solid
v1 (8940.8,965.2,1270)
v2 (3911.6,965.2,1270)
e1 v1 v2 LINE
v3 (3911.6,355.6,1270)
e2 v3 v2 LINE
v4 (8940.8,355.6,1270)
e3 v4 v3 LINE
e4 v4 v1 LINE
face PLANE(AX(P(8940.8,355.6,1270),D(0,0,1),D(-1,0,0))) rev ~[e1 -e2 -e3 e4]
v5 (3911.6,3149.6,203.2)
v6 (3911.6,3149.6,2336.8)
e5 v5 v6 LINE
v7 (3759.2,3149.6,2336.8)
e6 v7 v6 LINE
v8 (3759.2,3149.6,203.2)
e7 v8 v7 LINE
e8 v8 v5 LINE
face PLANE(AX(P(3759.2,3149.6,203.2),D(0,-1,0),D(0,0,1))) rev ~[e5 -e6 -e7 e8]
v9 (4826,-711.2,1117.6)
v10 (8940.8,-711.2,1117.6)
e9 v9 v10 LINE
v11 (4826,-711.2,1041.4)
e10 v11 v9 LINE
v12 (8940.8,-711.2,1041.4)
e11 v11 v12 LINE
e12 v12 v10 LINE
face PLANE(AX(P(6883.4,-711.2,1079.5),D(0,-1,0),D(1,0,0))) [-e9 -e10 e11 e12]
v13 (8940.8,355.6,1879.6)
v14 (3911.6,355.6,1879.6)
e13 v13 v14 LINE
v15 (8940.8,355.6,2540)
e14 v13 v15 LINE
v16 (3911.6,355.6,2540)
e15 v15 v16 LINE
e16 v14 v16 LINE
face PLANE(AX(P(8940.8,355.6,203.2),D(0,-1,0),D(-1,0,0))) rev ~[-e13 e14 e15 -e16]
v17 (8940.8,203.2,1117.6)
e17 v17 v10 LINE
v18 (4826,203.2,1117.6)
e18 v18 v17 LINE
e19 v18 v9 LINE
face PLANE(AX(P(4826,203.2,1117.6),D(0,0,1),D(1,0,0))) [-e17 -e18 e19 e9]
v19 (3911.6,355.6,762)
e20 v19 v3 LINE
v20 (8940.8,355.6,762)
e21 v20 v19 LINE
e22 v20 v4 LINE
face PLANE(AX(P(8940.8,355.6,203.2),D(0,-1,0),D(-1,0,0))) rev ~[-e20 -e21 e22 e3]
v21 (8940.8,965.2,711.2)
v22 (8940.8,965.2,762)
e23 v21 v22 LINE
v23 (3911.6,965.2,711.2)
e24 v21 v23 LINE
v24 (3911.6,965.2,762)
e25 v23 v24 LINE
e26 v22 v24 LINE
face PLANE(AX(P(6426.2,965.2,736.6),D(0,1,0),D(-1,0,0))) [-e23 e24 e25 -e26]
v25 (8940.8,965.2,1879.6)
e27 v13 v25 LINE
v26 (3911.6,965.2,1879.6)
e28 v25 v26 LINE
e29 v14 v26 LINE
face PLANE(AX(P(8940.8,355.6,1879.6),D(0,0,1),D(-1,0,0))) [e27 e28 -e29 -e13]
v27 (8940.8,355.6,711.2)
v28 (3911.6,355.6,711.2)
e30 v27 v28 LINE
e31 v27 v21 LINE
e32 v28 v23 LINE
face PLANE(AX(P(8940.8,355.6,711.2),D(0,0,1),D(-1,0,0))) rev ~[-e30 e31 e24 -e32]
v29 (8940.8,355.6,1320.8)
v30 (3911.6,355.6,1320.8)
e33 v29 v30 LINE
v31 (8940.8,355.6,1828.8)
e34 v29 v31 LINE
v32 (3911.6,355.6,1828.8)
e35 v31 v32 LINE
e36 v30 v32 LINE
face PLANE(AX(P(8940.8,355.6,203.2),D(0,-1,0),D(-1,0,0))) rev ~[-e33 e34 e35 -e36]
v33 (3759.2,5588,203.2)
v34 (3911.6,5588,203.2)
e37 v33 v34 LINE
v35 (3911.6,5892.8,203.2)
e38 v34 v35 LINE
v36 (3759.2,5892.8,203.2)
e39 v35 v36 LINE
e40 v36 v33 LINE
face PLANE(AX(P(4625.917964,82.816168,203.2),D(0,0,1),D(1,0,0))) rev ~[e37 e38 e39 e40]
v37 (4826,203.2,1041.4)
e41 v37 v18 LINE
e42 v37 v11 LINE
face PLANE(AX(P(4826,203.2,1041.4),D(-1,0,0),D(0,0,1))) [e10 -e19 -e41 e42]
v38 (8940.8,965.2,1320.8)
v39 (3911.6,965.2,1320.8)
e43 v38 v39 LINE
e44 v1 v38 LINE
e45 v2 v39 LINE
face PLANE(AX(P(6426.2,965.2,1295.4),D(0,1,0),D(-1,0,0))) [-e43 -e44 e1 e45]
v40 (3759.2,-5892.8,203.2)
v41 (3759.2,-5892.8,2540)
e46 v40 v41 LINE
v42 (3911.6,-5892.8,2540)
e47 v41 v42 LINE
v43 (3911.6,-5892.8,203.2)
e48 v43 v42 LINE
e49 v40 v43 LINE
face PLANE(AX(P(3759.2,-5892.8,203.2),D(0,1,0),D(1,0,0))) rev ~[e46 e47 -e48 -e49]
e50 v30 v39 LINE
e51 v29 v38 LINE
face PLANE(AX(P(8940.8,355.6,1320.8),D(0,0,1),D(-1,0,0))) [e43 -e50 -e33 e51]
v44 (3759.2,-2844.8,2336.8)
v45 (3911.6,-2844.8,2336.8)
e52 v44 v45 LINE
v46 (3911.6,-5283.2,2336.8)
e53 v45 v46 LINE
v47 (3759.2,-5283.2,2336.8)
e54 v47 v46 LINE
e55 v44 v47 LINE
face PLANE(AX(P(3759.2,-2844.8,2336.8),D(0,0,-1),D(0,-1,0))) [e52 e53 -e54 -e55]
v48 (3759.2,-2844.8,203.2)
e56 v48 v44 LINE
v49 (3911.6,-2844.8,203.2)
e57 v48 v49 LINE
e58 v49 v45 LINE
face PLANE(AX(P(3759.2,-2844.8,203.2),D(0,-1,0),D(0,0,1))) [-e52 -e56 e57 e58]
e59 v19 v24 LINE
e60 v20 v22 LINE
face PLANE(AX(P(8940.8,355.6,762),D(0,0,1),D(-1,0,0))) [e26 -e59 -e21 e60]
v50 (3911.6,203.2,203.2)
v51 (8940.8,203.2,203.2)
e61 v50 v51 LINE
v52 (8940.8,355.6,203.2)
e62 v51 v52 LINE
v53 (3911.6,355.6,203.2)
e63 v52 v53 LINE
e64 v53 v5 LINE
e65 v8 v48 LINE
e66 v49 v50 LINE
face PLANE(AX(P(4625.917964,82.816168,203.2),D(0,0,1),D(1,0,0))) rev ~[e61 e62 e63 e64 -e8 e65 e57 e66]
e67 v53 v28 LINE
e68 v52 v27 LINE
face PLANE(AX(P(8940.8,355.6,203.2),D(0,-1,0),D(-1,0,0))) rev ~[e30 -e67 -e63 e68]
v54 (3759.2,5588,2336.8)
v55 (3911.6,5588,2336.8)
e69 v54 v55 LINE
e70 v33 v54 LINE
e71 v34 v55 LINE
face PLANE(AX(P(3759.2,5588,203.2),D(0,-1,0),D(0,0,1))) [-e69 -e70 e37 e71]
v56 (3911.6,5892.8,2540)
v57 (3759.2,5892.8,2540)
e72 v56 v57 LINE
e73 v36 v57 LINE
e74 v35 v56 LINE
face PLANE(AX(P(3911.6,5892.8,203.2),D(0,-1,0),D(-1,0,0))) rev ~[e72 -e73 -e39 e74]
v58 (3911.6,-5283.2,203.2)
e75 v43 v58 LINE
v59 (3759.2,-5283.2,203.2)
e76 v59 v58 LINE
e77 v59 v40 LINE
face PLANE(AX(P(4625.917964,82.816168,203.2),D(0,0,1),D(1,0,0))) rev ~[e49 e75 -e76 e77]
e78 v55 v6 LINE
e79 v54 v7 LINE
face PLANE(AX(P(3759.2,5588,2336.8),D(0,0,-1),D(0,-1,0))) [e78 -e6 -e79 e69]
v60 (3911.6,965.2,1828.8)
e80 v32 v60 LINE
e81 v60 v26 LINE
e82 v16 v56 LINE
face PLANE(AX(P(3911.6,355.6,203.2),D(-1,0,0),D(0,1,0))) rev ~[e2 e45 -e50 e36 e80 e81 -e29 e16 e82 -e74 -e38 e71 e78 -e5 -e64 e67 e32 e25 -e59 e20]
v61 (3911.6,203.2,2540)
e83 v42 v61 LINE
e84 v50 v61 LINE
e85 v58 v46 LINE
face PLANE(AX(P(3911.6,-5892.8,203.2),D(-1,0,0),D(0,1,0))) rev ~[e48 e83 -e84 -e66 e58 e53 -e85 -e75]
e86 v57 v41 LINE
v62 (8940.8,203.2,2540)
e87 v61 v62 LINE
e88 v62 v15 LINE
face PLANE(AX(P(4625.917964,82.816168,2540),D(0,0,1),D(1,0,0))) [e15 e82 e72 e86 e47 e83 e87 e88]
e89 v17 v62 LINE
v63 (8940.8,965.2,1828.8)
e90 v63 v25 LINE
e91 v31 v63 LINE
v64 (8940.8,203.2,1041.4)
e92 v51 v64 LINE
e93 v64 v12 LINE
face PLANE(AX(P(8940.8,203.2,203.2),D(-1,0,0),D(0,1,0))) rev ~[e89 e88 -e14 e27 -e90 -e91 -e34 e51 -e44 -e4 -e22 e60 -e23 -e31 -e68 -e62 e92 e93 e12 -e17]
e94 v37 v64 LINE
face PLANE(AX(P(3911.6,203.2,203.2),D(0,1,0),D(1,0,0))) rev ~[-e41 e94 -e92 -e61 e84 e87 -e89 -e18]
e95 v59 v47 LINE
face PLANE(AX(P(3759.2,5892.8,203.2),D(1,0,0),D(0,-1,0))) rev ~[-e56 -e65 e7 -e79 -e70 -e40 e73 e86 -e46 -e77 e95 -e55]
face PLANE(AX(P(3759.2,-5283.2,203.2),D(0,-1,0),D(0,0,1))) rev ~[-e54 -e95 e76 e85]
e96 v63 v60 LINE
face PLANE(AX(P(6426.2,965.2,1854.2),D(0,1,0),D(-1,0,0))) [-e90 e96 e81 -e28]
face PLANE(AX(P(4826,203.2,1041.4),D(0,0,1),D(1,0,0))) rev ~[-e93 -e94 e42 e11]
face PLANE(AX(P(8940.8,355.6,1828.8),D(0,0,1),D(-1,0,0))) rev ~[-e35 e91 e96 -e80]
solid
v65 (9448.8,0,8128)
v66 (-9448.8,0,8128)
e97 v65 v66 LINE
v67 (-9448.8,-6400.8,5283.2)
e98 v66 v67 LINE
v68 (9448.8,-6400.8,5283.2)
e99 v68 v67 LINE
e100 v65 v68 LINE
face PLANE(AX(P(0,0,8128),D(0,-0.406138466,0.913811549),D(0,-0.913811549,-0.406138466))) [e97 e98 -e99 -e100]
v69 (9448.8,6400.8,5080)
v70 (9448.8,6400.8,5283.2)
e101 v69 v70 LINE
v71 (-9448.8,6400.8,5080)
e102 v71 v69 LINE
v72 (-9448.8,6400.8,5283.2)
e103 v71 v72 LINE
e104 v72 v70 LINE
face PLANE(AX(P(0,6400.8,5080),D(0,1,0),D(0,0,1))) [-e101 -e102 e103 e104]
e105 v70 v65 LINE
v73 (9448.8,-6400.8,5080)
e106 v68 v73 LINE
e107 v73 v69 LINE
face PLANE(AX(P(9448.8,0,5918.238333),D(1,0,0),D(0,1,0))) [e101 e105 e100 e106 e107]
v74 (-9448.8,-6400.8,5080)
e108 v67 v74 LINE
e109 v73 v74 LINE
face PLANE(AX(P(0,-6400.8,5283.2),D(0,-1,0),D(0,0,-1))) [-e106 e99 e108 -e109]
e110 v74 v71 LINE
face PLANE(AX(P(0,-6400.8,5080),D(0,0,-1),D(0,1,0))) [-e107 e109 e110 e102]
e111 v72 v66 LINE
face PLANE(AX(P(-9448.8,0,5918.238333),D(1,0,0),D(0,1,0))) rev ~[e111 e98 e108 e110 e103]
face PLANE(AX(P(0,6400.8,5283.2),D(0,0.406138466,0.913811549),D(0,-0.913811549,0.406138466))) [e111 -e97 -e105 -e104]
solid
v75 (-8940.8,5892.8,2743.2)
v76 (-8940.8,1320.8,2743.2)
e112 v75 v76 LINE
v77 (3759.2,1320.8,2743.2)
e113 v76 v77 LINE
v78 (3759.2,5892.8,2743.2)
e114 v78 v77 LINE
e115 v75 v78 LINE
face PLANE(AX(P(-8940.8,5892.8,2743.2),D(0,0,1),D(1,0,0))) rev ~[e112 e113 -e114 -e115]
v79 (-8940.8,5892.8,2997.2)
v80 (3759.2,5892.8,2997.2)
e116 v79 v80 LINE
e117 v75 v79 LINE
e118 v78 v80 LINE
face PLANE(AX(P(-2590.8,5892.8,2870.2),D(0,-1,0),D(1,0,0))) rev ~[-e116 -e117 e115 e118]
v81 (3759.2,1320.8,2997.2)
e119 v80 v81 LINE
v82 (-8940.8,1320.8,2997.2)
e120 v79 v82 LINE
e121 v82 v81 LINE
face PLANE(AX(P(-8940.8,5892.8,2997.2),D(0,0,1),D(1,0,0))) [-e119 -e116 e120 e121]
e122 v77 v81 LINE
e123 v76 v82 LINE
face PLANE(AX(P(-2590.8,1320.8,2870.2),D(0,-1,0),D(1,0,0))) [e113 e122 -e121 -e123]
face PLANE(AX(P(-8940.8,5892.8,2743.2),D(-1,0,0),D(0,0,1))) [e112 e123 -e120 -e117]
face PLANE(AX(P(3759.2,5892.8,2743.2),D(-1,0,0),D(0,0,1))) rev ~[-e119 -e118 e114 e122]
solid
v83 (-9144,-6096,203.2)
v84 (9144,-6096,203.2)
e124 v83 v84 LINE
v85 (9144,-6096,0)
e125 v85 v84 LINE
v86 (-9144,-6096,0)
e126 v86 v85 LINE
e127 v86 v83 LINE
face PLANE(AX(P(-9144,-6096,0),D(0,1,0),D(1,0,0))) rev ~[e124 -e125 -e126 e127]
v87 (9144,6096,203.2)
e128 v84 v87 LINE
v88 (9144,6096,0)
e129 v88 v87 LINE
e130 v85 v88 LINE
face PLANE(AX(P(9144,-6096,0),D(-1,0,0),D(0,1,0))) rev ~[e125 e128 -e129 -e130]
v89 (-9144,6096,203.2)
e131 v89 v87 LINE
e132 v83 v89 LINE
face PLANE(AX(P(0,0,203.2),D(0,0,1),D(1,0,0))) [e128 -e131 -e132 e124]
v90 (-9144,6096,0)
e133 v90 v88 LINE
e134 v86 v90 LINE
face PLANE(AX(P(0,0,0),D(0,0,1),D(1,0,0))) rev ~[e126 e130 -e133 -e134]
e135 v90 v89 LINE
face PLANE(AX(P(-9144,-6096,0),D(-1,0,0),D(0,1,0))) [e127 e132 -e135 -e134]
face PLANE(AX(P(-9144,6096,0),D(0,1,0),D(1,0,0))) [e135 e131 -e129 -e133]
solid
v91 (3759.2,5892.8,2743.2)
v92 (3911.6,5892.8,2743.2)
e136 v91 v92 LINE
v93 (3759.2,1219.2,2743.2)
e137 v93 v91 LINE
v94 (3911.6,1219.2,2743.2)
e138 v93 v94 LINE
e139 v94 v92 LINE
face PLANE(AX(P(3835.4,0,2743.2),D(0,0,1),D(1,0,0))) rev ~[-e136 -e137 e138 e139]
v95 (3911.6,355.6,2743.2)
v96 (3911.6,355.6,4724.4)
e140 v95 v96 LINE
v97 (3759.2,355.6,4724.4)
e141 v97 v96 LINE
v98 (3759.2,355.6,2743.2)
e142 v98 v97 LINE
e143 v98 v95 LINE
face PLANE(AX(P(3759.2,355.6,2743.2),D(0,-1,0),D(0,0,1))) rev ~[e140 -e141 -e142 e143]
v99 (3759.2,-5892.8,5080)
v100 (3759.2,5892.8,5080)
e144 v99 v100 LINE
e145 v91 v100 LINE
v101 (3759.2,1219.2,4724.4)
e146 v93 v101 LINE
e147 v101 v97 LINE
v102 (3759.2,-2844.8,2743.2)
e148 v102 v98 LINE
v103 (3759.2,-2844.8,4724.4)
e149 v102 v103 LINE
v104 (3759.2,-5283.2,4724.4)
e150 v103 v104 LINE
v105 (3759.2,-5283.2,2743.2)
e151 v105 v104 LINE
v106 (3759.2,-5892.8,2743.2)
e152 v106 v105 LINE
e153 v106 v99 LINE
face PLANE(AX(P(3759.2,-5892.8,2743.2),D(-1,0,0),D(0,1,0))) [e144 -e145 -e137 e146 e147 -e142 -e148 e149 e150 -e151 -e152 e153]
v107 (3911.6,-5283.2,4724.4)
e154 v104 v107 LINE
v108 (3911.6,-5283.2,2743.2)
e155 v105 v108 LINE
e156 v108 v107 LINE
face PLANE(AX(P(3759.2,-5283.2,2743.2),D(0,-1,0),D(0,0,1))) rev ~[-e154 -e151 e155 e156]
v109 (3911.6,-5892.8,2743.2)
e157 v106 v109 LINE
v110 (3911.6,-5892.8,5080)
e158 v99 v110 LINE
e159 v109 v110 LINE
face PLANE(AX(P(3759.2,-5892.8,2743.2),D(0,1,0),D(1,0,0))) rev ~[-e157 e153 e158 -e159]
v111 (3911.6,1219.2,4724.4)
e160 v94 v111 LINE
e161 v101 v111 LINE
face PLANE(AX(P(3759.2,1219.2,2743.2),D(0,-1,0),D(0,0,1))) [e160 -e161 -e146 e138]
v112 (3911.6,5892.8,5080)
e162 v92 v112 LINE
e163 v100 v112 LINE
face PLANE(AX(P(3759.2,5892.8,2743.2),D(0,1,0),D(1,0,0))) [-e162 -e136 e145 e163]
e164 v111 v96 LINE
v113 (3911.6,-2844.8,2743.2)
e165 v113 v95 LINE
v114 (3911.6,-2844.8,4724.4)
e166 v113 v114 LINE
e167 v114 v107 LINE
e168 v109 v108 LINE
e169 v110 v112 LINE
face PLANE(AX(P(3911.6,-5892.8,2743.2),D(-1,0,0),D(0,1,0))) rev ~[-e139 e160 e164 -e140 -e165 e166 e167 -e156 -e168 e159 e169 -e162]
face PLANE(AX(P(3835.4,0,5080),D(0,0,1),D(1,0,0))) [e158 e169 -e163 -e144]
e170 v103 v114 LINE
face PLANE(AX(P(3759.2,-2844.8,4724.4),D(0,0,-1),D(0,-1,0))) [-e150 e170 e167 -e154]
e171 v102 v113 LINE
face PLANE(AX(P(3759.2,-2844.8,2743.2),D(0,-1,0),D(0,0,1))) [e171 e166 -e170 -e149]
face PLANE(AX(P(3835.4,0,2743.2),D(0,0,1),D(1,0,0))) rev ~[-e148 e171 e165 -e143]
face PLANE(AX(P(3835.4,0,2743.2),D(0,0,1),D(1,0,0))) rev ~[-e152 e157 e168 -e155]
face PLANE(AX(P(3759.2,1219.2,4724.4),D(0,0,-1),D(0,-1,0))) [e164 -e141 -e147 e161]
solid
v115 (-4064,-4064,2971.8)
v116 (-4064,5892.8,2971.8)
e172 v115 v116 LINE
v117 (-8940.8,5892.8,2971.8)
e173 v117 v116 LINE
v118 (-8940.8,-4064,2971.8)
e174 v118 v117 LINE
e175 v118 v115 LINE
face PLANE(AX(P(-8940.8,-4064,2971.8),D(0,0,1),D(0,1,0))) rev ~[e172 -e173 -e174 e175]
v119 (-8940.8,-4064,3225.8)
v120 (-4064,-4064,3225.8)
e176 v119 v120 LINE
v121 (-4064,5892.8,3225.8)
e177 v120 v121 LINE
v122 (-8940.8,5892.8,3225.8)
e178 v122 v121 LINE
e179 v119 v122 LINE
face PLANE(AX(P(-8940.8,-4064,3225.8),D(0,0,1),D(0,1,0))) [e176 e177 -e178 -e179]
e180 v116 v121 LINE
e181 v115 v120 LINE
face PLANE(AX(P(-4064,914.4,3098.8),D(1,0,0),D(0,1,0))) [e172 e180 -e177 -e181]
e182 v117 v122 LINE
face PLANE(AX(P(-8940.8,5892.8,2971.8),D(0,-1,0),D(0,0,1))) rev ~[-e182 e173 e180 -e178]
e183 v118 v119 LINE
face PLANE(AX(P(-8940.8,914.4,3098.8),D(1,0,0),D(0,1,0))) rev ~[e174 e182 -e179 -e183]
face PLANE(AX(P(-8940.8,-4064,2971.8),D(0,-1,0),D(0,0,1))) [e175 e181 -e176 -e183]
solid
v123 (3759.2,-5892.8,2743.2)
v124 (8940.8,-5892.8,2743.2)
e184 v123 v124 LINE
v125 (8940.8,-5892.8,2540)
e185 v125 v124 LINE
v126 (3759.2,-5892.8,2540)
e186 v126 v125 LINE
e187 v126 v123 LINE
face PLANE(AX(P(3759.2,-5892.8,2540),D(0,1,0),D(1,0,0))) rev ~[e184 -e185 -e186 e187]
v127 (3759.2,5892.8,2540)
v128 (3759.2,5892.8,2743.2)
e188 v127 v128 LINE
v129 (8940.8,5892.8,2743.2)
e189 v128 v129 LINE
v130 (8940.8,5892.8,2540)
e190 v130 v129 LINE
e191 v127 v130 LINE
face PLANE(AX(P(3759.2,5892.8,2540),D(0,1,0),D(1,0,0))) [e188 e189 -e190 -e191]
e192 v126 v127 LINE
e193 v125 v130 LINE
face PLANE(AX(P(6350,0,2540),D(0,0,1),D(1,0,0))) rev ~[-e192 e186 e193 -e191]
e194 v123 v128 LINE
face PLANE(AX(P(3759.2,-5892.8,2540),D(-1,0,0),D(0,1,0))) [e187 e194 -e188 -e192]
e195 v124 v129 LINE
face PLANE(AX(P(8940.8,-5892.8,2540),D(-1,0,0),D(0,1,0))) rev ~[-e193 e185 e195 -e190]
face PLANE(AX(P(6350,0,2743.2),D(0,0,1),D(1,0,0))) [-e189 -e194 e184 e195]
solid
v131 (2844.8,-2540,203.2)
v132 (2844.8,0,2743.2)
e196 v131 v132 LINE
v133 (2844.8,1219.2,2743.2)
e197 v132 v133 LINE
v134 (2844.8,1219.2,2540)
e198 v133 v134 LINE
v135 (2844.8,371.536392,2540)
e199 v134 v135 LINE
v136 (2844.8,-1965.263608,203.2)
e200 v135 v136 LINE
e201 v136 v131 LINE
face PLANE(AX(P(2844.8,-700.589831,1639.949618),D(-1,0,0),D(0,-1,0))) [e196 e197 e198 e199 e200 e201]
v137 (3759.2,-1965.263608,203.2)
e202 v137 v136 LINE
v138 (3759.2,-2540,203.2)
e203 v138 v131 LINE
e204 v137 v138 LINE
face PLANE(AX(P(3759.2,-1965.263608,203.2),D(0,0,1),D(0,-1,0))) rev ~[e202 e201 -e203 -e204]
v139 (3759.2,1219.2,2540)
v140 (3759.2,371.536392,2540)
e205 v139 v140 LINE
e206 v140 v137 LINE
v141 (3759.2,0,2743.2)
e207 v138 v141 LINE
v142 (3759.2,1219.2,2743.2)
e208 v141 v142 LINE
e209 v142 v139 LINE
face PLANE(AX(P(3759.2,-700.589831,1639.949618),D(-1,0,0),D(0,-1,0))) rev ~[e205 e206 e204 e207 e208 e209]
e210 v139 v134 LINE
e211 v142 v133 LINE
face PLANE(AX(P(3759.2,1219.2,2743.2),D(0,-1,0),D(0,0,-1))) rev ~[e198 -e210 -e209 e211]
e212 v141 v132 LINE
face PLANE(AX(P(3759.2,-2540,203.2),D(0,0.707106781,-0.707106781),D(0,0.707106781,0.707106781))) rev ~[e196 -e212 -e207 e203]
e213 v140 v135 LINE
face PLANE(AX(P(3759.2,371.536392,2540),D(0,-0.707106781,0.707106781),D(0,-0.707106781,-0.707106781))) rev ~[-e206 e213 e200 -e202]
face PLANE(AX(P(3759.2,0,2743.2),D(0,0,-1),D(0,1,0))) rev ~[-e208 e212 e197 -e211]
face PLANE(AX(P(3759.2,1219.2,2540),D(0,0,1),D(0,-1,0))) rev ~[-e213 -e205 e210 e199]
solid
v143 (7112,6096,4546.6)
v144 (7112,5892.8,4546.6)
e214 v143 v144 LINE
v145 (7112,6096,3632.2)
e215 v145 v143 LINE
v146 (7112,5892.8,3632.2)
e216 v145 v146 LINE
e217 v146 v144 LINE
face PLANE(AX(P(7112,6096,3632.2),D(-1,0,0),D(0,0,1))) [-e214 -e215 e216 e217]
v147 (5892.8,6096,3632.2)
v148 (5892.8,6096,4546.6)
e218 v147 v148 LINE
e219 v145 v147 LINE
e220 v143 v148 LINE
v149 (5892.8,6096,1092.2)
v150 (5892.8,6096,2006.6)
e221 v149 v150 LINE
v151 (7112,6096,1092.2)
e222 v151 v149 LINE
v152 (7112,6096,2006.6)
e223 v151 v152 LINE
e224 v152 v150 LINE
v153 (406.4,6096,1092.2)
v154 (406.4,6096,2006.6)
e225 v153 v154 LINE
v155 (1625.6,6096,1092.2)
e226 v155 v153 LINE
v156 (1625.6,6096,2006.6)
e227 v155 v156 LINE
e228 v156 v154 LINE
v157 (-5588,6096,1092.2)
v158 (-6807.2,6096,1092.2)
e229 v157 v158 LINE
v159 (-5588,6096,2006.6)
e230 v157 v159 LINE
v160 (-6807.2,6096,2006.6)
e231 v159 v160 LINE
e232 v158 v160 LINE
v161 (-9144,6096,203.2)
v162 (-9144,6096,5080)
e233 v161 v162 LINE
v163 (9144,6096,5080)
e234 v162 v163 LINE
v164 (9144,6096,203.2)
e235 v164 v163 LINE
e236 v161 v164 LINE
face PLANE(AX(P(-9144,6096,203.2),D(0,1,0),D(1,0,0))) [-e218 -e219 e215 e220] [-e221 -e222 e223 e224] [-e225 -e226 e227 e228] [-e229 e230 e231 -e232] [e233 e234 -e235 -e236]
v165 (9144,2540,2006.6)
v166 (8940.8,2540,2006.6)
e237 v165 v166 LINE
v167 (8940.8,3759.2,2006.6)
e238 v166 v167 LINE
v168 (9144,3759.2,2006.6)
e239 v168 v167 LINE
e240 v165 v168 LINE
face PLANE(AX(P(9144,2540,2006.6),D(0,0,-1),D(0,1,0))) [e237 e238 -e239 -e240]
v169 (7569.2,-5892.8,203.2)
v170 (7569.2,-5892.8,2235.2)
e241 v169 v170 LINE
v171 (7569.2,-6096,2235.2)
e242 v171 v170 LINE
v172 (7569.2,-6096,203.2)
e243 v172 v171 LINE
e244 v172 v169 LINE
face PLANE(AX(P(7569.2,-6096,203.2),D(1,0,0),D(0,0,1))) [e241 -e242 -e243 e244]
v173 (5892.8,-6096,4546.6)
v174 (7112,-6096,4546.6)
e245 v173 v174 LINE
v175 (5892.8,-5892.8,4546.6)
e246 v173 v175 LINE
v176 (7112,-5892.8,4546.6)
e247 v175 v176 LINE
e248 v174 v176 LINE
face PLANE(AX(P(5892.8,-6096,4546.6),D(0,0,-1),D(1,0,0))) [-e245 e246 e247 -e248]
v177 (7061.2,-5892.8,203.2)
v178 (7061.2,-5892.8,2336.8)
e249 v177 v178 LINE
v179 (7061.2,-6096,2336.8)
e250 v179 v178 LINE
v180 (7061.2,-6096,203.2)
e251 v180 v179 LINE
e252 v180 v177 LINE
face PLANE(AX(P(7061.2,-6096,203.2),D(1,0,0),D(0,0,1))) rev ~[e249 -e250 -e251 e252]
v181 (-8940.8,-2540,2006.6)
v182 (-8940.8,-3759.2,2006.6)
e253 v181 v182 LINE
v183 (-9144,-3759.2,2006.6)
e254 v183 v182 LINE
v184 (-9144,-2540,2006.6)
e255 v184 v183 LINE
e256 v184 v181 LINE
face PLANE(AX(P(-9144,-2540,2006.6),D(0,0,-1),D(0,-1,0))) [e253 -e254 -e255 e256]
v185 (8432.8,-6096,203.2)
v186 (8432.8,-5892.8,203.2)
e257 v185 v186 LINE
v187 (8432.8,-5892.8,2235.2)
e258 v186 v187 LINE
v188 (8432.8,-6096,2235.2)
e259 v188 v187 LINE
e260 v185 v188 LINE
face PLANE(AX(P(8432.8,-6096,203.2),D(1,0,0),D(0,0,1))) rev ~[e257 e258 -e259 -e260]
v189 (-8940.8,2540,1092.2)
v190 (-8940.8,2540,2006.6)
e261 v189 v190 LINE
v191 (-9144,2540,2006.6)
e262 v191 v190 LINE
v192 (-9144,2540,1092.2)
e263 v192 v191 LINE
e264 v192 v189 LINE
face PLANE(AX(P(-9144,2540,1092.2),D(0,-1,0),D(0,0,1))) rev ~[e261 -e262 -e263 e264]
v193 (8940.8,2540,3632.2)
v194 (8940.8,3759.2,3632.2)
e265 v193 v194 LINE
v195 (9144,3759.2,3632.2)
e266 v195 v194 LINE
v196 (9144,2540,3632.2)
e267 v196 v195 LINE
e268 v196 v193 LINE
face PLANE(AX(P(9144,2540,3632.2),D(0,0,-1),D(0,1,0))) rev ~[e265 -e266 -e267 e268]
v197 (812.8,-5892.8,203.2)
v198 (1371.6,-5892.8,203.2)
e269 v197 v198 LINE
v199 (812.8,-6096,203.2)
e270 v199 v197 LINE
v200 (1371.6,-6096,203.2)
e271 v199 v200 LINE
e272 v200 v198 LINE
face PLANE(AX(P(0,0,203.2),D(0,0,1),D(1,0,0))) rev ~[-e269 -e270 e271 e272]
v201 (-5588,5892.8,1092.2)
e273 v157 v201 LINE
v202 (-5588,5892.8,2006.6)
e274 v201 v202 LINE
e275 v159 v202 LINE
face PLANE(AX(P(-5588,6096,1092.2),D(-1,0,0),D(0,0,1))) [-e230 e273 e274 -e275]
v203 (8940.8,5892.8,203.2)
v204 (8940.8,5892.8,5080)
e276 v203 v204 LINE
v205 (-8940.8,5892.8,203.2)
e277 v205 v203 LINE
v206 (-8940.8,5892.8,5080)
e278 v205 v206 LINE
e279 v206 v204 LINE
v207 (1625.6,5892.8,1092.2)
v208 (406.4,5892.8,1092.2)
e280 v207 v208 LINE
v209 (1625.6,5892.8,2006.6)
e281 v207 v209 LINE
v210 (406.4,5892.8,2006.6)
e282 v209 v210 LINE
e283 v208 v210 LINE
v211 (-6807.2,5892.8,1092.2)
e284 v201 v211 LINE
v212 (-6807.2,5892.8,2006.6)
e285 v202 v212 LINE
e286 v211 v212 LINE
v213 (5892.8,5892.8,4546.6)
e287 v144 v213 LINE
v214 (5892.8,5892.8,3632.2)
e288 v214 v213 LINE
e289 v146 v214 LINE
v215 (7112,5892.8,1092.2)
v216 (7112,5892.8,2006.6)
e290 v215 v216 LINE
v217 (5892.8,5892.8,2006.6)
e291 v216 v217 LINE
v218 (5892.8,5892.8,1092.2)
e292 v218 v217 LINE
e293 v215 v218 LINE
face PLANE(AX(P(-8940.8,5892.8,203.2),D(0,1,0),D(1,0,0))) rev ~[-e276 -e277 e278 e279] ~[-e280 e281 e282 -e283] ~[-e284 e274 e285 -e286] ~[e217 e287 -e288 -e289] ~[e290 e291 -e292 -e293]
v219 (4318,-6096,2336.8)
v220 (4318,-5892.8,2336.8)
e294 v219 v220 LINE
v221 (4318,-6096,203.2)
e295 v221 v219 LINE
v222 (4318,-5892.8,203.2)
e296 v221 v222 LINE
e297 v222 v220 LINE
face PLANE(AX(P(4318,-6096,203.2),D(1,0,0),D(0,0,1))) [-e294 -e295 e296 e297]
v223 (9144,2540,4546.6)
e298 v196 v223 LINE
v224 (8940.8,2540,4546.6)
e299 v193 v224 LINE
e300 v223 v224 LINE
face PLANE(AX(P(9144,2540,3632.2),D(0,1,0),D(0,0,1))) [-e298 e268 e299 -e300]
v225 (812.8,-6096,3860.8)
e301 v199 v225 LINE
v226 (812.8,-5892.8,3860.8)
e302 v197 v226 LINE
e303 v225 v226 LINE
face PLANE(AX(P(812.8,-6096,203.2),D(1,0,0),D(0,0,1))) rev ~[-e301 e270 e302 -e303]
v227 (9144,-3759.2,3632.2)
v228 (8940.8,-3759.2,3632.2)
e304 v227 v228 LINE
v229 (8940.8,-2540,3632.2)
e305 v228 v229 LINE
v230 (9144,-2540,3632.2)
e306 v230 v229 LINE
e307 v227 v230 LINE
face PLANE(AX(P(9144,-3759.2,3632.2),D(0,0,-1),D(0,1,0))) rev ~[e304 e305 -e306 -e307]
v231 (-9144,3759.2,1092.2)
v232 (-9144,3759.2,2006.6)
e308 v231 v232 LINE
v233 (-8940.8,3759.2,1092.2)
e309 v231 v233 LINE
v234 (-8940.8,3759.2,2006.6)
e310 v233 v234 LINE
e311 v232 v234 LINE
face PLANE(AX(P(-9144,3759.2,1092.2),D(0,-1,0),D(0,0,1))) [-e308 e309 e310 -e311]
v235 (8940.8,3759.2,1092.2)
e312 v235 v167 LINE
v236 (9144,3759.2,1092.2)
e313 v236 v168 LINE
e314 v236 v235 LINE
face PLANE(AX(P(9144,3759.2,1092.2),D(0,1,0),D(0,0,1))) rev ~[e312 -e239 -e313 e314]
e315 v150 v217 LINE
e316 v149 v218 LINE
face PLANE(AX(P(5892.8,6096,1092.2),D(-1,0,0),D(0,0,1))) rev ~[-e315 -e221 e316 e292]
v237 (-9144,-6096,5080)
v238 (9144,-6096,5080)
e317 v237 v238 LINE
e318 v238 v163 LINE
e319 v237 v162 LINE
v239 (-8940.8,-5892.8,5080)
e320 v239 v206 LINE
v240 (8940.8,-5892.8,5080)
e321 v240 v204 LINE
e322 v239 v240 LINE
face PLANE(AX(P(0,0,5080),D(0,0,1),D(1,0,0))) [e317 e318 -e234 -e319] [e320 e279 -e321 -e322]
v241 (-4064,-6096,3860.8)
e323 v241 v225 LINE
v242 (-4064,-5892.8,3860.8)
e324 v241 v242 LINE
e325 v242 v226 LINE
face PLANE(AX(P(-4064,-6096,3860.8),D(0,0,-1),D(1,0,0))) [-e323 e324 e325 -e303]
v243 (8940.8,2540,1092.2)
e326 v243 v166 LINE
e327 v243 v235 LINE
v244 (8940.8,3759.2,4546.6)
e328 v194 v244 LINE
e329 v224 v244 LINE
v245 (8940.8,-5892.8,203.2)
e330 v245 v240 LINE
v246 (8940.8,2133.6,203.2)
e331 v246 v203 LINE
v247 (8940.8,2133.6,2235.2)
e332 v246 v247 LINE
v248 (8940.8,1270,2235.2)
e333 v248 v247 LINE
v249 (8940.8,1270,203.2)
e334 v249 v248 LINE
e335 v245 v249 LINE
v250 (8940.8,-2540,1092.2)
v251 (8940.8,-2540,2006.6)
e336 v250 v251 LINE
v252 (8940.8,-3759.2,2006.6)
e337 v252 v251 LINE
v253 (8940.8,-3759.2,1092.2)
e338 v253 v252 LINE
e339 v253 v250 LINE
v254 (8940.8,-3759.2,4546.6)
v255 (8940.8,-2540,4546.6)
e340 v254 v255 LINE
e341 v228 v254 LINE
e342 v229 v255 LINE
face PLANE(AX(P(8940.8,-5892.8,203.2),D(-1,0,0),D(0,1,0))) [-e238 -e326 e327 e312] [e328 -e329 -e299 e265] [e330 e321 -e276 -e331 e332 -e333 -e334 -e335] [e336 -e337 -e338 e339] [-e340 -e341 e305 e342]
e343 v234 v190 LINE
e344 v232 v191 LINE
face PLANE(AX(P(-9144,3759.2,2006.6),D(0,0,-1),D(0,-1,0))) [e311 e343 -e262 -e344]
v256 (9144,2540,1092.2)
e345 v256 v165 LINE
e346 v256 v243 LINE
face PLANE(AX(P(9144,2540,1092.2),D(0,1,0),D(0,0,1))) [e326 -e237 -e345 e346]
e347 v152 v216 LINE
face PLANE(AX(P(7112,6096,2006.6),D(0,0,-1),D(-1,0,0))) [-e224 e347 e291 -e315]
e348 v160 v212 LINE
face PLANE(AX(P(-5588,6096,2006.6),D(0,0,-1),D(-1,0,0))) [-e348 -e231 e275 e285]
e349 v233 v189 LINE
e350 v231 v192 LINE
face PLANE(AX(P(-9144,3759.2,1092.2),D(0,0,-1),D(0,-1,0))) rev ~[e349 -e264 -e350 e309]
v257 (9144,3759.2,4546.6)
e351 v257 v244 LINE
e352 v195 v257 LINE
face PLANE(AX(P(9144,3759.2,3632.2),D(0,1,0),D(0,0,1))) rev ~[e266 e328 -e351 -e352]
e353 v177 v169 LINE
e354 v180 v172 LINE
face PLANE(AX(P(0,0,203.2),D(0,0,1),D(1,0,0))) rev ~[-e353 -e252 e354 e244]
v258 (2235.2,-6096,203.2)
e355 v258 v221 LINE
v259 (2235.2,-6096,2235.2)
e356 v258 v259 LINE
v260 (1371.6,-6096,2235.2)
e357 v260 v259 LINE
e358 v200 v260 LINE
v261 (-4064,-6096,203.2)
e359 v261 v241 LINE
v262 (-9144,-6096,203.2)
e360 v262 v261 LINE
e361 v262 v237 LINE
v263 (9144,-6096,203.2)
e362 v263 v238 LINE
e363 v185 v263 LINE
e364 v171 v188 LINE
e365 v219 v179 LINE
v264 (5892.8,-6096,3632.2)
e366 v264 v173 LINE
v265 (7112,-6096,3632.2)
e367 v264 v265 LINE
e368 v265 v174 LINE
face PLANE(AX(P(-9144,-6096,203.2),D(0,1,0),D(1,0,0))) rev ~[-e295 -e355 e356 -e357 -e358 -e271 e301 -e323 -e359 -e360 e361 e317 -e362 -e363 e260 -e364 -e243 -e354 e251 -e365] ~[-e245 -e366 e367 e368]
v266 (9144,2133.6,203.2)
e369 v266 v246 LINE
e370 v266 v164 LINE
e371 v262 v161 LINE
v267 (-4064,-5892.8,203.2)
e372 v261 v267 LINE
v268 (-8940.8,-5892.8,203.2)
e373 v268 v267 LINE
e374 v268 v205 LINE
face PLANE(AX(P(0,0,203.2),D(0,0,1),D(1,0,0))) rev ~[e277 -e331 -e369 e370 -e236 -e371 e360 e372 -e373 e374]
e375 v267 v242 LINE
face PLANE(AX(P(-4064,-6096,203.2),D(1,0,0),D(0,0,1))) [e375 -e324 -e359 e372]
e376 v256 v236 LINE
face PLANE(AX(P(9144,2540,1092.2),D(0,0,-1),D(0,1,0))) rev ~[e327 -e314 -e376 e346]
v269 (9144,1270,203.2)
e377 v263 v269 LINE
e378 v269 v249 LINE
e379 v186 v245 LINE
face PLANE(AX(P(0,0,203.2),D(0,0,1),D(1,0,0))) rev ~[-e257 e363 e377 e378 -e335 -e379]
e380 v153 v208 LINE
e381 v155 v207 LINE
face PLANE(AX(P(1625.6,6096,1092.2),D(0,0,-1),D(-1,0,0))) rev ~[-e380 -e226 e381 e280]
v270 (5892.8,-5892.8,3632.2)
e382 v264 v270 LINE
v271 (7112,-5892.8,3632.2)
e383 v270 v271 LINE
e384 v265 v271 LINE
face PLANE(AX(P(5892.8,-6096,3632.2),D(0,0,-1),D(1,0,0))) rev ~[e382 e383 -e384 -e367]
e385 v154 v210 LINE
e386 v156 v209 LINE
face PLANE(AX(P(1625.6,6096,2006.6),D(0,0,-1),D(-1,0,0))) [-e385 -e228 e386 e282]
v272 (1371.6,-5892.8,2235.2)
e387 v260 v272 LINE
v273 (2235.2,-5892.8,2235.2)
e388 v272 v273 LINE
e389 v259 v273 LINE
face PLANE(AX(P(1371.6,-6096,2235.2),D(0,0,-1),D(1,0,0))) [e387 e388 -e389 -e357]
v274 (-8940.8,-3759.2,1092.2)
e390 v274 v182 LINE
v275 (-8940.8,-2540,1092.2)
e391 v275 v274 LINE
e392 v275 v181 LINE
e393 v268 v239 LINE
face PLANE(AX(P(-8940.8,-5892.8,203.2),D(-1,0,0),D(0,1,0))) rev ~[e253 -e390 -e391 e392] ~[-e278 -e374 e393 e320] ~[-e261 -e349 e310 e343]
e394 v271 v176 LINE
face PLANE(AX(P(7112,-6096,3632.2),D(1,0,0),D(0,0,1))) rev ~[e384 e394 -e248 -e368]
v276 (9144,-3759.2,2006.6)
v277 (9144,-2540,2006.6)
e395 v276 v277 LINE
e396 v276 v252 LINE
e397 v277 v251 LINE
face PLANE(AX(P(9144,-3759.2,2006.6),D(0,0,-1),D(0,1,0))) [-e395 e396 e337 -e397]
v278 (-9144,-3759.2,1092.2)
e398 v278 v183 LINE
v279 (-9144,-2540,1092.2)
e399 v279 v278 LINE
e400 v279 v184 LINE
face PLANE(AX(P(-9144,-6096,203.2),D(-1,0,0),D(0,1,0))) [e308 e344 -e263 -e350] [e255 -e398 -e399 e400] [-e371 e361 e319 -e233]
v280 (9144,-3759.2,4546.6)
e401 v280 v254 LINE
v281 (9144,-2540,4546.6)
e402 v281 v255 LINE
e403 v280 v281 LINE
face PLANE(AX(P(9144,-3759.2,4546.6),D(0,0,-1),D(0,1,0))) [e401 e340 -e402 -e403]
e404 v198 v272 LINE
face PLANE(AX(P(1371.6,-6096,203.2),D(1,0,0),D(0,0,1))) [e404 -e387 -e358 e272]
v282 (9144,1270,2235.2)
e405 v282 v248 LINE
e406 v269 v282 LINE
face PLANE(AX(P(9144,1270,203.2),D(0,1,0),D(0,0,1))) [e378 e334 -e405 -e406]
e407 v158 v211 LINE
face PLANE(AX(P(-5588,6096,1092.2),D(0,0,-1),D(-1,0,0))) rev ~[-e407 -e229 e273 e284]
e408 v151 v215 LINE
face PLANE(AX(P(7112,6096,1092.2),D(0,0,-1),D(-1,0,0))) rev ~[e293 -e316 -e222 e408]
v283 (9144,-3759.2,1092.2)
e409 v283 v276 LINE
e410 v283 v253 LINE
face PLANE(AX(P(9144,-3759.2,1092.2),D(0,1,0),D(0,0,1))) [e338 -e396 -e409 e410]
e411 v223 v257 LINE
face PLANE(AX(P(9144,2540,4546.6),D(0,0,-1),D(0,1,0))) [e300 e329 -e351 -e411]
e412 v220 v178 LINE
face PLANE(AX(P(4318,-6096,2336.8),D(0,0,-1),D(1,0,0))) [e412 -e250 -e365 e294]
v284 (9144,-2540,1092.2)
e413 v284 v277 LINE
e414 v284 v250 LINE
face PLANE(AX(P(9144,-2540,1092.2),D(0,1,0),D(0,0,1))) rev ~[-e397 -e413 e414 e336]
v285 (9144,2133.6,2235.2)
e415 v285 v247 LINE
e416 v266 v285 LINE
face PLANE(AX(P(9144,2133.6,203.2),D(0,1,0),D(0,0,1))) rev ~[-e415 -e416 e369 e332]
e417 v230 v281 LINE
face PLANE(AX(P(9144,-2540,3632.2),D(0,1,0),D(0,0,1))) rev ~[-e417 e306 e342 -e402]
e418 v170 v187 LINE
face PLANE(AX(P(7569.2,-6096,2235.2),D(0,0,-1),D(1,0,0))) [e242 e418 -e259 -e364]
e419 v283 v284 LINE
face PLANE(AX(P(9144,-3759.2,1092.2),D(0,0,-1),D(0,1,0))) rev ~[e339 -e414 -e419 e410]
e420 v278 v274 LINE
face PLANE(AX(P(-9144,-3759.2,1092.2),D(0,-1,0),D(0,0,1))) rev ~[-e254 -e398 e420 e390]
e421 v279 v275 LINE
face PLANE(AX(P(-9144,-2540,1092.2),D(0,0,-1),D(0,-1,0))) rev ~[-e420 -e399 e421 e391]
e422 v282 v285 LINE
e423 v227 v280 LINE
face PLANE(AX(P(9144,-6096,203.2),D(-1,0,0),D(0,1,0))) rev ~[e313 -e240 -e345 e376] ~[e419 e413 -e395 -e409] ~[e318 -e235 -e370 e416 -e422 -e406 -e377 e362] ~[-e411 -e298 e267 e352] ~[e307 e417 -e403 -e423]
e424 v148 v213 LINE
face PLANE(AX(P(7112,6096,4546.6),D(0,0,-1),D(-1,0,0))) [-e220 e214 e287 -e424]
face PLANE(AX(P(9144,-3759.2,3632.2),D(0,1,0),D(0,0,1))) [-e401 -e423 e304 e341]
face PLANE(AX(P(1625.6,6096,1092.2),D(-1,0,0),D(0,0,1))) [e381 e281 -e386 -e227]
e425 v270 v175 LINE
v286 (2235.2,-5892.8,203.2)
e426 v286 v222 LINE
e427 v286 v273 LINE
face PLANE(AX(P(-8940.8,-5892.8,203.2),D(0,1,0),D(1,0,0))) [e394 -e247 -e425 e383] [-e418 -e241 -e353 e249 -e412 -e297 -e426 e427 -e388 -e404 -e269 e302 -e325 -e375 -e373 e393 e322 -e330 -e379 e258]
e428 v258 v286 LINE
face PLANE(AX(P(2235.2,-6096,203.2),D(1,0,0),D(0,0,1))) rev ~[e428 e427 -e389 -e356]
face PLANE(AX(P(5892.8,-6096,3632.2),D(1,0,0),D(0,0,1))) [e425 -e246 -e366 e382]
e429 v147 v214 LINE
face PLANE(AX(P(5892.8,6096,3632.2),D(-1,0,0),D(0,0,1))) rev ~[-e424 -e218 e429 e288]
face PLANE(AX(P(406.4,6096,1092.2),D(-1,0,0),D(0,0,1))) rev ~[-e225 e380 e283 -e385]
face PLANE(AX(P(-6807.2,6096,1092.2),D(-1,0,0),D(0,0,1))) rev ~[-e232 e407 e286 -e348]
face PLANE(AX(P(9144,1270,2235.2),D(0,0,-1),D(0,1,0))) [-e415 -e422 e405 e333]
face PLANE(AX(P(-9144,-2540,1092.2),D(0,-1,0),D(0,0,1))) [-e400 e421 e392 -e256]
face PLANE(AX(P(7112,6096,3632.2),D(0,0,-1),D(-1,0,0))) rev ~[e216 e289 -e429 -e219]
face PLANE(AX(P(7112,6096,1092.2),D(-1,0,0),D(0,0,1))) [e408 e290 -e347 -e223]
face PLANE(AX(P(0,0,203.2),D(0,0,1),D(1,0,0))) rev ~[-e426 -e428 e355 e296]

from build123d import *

# Parameters (mm, degrees)
F0_W          = 18288
F0_H          = 12192
F1_DEPTH      = 203.2
F2_W          = 18288
F2_H          = 12192
F2_W_2        = 17881.6
F2_H_2        = 11785.6
F3_DEPTH      = 4876.8
F5_DEPTH      = 9448.8
F5_DEPTH_BACK = 9448.8
F7_DEPTH      = 2336.8
F8_W          = 5181.6
F8_H          = 11785.6
F9_DEPTH      = 203.2
F10_W         = 4876.8
F10_H         = 3657.6
F10_W_2       = 863.6
F10_H_2       = 2032
F10_W_3       = 2743.2
F10_H_3       = 2133.6
F10_W_4       = 1219.2
F10_H_4       = 914.4
F11_DEPTH     = 203.2
F12_W         = 863.6
F12_H         = 2032
F13_DEPTH     = 203.2
F15_DEPTH     = 914.4
F16_W         = 2438.4
F16_H         = 2133.6
F17_DEPTH     = 152.4
F18_W         = 152.4
F18_H         = 11785.6
F19_DEPTH     = 2336.8
F20_W         = 863.6
F20_H         = 1981.2
F20_W_2       = 2438.4
F21_DEPTH     = 152.4
F22_W         = 12700
F22_H         = 254
F23_DEPTH     = 4572
F24_W         = 9956.8
F24_H         = 254
F25_DEPTH     = 4876.8
F26_W         = 5029.2
F26_H         = 50.8
F27_DEPTH     = 609.6
F28_W         = 4114.8
F28_H         = 76.2
F29_DEPTH     = 914.4
F30_W         = 1219.2
F30_H         = 914.4
F31_DEPTH     = 203.2
F32_W         = 1219.2
F32_H         = 914.4
F33_DEPTH     = 203.2
F34_W         = 1219.2
F34_H         = 914.4
F35_DEPTH     = 203.2


with BuildPart() as f1:
    # F0 (on Top) → F1 (new body)
    with BuildSketch(Plane.XY):
        Rectangle(F0_W, F0_H)
    extrude(amount=F1_DEPTH)


with BuildPart() as f3:
    # F2 (on face) → F3 (new body)
    with BuildSketch(Plane.XY.offset(203.2)):
        Rectangle(F2_W, F2_H)
        Rectangle(F2_W_2, F2_H_2, mode=Mode.SUBTRACT)
    extrude(amount=F3_DEPTH)

    # F10 (on face) → F11 (cut, through all)
    with BuildSketch(Plane.XZ.offset(6096)):
        with Locations((-1625.6, 2032)):
            Rectangle(F10_W, F10_H)
        with Locations((1803.4, 1219.2)):
            Rectangle(F10_W_2, F10_H_2)
        with Locations((5689.6, 1270)):
            Rectangle(F10_W_3, F10_H_3)
        with Locations((8001, 1219.2)):
            Rectangle(F10_W_2, F10_H_2)
        with Locations((6502.4, 4089.4)):
            Rectangle(F10_W_4, F10_H_4)
    extrude(amount=-F11_DEPTH, mode=Mode.SUBTRACT)

    # F12 (on face) → F13 (cut, through all)
    with BuildSketch(Plane.YZ.offset(9144)):
        with Locations((1701.8, 1219.2)):
            Rectangle(F12_W, F12_H)
    extrude(amount=-F13_DEPTH, mode=Mode.SUBTRACT)

    # F30 (on face) → F31 (cut, through all)
    with BuildSketch(Plane(origin=(0, 6096, 0), x_dir=(-1, 0, 0), z_dir=(0, 1, 0))):
        with Locations((-6502.4, 4089.4)):
            Rectangle(F30_W, F30_H)
        with Locations((-6502.4, 1549.4)):
            Rectangle(F30_W, F30_H)
        with Locations((-1016, 1549.4)):
            Rectangle(F30_W, F30_H)
        with Locations((6197.6, 1549.4)):
            Rectangle(F30_W, F30_H)
    extrude(amount=-F31_DEPTH, mode=Mode.SUBTRACT)

    # F32 (on face) → F33 (cut, through all)
    with BuildSketch(Plane(origin=(-9144, 0, 0), x_dir=(0, -1, 0), z_dir=(-1, 0, 0))):
        with Locations((-3149.6, 1549.4)):
            Rectangle(F32_W, F32_H)
        with Locations((3149.6, 1549.4)):
            Rectangle(F32_W, F32_H)
    extrude(amount=-F33_DEPTH, mode=Mode.SUBTRACT)

    # F34 (on face) → F35 (cut, through all)
    with BuildSketch(Plane.YZ.offset(9144)):
        with Locations((-3149.6, 1549.4)):
            Rectangle(F34_W, F34_H)
        with Locations((3149.6, 1549.4)):
            Rectangle(F34_W, F34_H)
        with Locations((-3149.6, 4089.4)):
            Rectangle(F34_W, F34_H)
        with Locations((3149.6, 4089.4)):
            Rectangle(F34_W, F34_H)
    extrude(amount=-F35_DEPTH, mode=Mode.SUBTRACT)


with BuildPart() as f5:
    # F4 (on Right) → F5 (new body, two sides)
    with BuildSketch(Plane.YZ) as f5_sk:
        Polygon((-6400.8, 5080), (6400.8, 5080), (6400.8, 5283.2), (0, 8128), (-6400.8, 5283.2), align=None)
    extrude(amount=F5_DEPTH)
    extrude(f5_sk.sketch, amount=-F5_DEPTH_BACK)


with BuildPart() as f7:
    # F6 (on face) → F7 (new body)
    with BuildSketch(Plane.XY.offset(203.2)):
        Polygon((3759.2, 5892.8), (3759.2, -5892.8), (3911.6, -5892.8), (3911.6, 203.2), (8940.8, 203.2), (8940.8, 355.6), (3911.6, 355.6), (3911.6, 5892.8), align=None)
    extrude(amount=F7_DEPTH)

    # F16 (on face) → F17 (cut, through all)
    with BuildSketch(Plane(origin=(3759.2, 0, 0), x_dir=(0, -1, 0), z_dir=(-1, 0, 0))):
        with Locations((-4368.8, 1270)):
            Rectangle(F16_W, F16_H)
        with Locations((4064, 1270)):
            Rectangle(F16_W, F16_H)
    extrude(amount=-F17_DEPTH, mode=Mode.SUBTRACT)

    # F26 (on face) → F27 (join)
    with BuildSketch(Plane(origin=(0, 355.6, 0), x_dir=(-1, 0, 0), z_dir=(0, 1, 0))):
        with Locations((-6426.2, 1854.2)):
            Rectangle(F26_W, F26_H)
        with Locations((-6426.2, 1295.4)):
            Rectangle(F26_W, F26_H)
        with Locations((-6426.2, 736.6)):
            Rectangle(F26_W, F26_H)
    extrude(amount=F27_DEPTH)

    # F28 (on face) → F29 (join)
    with BuildSketch(Plane.XZ.offset(-203.2)):
        with Locations((6883.4, 1079.5)):
            Rectangle(F28_W, F28_H)
    extrude(amount=F29_DEPTH)


with BuildPart() as f9:
    # F8 (on face) → F9 (new body)
    with BuildSketch(Plane.XY.offset(2540)):
        with Locations((6350, 0)):
            Rectangle(F8_W, F8_H)
    extrude(amount=F9_DEPTH)


with BuildPart() as f15:
    # F14 (on face) → F15 (new body)
    with BuildSketch(Plane(origin=(3759.2, 0, 0), x_dir=(0, -1, 0), z_dir=(-1, 0, 0))):
        Polygon((-371.5363917484, 2540), (1965.2636082516, 203.2), (2540, 203.2), (0, 2743.2), (-574.7363917484, 2743.2), (-1219.2, 2743.2), (-1219.2, 2540), align=None)
    extrude(amount=F15_DEPTH)


with BuildPart() as f19:
    # F18 (on face) → F19 (new body, through all)
    with BuildSketch(Plane.XY.offset(2743.2)):
        with Locations((3835.4, 0)):
            Rectangle(F18_W, F18_H)
    extrude(amount=F19_DEPTH)

    # F20 (on face) → F21 (cut, through all)
    with BuildSketch(Plane(origin=(3759.2, 0, 0), x_dir=(0, -1, 0), z_dir=(-1, 0, 0))):
        with Locations((-787.4, 3733.8)):
            Rectangle(F20_W, F20_H)
        with Locations((4064, 3733.8)):
            Rectangle(F20_W_2, F20_H)
    extrude(amount=-F21_DEPTH, mode=Mode.SUBTRACT)


with BuildPart() as f23:
    # F22 (on face) → F23 (new body)
    with BuildSketch(Plane.XZ.offset(-5892.8)):
        with Locations((-2590.8, 2870.2)):
            Rectangle(F22_W, F22_H)
    extrude(amount=F23_DEPTH)


with BuildPart() as f25:
    # F24 (on face) → F25 (new body)
    with BuildSketch(Plane.YZ.offset(-8940.8)):
        with Locations((914.4, 3098.8)):
            Rectangle(F24_W, F24_H)
    extrude(amount=F25_DEPTH)


solid = Compound([f1.part, f3.part, f5.part, f7.part, f9.part, f15.part, f19.part, f23.part, f25.part])
